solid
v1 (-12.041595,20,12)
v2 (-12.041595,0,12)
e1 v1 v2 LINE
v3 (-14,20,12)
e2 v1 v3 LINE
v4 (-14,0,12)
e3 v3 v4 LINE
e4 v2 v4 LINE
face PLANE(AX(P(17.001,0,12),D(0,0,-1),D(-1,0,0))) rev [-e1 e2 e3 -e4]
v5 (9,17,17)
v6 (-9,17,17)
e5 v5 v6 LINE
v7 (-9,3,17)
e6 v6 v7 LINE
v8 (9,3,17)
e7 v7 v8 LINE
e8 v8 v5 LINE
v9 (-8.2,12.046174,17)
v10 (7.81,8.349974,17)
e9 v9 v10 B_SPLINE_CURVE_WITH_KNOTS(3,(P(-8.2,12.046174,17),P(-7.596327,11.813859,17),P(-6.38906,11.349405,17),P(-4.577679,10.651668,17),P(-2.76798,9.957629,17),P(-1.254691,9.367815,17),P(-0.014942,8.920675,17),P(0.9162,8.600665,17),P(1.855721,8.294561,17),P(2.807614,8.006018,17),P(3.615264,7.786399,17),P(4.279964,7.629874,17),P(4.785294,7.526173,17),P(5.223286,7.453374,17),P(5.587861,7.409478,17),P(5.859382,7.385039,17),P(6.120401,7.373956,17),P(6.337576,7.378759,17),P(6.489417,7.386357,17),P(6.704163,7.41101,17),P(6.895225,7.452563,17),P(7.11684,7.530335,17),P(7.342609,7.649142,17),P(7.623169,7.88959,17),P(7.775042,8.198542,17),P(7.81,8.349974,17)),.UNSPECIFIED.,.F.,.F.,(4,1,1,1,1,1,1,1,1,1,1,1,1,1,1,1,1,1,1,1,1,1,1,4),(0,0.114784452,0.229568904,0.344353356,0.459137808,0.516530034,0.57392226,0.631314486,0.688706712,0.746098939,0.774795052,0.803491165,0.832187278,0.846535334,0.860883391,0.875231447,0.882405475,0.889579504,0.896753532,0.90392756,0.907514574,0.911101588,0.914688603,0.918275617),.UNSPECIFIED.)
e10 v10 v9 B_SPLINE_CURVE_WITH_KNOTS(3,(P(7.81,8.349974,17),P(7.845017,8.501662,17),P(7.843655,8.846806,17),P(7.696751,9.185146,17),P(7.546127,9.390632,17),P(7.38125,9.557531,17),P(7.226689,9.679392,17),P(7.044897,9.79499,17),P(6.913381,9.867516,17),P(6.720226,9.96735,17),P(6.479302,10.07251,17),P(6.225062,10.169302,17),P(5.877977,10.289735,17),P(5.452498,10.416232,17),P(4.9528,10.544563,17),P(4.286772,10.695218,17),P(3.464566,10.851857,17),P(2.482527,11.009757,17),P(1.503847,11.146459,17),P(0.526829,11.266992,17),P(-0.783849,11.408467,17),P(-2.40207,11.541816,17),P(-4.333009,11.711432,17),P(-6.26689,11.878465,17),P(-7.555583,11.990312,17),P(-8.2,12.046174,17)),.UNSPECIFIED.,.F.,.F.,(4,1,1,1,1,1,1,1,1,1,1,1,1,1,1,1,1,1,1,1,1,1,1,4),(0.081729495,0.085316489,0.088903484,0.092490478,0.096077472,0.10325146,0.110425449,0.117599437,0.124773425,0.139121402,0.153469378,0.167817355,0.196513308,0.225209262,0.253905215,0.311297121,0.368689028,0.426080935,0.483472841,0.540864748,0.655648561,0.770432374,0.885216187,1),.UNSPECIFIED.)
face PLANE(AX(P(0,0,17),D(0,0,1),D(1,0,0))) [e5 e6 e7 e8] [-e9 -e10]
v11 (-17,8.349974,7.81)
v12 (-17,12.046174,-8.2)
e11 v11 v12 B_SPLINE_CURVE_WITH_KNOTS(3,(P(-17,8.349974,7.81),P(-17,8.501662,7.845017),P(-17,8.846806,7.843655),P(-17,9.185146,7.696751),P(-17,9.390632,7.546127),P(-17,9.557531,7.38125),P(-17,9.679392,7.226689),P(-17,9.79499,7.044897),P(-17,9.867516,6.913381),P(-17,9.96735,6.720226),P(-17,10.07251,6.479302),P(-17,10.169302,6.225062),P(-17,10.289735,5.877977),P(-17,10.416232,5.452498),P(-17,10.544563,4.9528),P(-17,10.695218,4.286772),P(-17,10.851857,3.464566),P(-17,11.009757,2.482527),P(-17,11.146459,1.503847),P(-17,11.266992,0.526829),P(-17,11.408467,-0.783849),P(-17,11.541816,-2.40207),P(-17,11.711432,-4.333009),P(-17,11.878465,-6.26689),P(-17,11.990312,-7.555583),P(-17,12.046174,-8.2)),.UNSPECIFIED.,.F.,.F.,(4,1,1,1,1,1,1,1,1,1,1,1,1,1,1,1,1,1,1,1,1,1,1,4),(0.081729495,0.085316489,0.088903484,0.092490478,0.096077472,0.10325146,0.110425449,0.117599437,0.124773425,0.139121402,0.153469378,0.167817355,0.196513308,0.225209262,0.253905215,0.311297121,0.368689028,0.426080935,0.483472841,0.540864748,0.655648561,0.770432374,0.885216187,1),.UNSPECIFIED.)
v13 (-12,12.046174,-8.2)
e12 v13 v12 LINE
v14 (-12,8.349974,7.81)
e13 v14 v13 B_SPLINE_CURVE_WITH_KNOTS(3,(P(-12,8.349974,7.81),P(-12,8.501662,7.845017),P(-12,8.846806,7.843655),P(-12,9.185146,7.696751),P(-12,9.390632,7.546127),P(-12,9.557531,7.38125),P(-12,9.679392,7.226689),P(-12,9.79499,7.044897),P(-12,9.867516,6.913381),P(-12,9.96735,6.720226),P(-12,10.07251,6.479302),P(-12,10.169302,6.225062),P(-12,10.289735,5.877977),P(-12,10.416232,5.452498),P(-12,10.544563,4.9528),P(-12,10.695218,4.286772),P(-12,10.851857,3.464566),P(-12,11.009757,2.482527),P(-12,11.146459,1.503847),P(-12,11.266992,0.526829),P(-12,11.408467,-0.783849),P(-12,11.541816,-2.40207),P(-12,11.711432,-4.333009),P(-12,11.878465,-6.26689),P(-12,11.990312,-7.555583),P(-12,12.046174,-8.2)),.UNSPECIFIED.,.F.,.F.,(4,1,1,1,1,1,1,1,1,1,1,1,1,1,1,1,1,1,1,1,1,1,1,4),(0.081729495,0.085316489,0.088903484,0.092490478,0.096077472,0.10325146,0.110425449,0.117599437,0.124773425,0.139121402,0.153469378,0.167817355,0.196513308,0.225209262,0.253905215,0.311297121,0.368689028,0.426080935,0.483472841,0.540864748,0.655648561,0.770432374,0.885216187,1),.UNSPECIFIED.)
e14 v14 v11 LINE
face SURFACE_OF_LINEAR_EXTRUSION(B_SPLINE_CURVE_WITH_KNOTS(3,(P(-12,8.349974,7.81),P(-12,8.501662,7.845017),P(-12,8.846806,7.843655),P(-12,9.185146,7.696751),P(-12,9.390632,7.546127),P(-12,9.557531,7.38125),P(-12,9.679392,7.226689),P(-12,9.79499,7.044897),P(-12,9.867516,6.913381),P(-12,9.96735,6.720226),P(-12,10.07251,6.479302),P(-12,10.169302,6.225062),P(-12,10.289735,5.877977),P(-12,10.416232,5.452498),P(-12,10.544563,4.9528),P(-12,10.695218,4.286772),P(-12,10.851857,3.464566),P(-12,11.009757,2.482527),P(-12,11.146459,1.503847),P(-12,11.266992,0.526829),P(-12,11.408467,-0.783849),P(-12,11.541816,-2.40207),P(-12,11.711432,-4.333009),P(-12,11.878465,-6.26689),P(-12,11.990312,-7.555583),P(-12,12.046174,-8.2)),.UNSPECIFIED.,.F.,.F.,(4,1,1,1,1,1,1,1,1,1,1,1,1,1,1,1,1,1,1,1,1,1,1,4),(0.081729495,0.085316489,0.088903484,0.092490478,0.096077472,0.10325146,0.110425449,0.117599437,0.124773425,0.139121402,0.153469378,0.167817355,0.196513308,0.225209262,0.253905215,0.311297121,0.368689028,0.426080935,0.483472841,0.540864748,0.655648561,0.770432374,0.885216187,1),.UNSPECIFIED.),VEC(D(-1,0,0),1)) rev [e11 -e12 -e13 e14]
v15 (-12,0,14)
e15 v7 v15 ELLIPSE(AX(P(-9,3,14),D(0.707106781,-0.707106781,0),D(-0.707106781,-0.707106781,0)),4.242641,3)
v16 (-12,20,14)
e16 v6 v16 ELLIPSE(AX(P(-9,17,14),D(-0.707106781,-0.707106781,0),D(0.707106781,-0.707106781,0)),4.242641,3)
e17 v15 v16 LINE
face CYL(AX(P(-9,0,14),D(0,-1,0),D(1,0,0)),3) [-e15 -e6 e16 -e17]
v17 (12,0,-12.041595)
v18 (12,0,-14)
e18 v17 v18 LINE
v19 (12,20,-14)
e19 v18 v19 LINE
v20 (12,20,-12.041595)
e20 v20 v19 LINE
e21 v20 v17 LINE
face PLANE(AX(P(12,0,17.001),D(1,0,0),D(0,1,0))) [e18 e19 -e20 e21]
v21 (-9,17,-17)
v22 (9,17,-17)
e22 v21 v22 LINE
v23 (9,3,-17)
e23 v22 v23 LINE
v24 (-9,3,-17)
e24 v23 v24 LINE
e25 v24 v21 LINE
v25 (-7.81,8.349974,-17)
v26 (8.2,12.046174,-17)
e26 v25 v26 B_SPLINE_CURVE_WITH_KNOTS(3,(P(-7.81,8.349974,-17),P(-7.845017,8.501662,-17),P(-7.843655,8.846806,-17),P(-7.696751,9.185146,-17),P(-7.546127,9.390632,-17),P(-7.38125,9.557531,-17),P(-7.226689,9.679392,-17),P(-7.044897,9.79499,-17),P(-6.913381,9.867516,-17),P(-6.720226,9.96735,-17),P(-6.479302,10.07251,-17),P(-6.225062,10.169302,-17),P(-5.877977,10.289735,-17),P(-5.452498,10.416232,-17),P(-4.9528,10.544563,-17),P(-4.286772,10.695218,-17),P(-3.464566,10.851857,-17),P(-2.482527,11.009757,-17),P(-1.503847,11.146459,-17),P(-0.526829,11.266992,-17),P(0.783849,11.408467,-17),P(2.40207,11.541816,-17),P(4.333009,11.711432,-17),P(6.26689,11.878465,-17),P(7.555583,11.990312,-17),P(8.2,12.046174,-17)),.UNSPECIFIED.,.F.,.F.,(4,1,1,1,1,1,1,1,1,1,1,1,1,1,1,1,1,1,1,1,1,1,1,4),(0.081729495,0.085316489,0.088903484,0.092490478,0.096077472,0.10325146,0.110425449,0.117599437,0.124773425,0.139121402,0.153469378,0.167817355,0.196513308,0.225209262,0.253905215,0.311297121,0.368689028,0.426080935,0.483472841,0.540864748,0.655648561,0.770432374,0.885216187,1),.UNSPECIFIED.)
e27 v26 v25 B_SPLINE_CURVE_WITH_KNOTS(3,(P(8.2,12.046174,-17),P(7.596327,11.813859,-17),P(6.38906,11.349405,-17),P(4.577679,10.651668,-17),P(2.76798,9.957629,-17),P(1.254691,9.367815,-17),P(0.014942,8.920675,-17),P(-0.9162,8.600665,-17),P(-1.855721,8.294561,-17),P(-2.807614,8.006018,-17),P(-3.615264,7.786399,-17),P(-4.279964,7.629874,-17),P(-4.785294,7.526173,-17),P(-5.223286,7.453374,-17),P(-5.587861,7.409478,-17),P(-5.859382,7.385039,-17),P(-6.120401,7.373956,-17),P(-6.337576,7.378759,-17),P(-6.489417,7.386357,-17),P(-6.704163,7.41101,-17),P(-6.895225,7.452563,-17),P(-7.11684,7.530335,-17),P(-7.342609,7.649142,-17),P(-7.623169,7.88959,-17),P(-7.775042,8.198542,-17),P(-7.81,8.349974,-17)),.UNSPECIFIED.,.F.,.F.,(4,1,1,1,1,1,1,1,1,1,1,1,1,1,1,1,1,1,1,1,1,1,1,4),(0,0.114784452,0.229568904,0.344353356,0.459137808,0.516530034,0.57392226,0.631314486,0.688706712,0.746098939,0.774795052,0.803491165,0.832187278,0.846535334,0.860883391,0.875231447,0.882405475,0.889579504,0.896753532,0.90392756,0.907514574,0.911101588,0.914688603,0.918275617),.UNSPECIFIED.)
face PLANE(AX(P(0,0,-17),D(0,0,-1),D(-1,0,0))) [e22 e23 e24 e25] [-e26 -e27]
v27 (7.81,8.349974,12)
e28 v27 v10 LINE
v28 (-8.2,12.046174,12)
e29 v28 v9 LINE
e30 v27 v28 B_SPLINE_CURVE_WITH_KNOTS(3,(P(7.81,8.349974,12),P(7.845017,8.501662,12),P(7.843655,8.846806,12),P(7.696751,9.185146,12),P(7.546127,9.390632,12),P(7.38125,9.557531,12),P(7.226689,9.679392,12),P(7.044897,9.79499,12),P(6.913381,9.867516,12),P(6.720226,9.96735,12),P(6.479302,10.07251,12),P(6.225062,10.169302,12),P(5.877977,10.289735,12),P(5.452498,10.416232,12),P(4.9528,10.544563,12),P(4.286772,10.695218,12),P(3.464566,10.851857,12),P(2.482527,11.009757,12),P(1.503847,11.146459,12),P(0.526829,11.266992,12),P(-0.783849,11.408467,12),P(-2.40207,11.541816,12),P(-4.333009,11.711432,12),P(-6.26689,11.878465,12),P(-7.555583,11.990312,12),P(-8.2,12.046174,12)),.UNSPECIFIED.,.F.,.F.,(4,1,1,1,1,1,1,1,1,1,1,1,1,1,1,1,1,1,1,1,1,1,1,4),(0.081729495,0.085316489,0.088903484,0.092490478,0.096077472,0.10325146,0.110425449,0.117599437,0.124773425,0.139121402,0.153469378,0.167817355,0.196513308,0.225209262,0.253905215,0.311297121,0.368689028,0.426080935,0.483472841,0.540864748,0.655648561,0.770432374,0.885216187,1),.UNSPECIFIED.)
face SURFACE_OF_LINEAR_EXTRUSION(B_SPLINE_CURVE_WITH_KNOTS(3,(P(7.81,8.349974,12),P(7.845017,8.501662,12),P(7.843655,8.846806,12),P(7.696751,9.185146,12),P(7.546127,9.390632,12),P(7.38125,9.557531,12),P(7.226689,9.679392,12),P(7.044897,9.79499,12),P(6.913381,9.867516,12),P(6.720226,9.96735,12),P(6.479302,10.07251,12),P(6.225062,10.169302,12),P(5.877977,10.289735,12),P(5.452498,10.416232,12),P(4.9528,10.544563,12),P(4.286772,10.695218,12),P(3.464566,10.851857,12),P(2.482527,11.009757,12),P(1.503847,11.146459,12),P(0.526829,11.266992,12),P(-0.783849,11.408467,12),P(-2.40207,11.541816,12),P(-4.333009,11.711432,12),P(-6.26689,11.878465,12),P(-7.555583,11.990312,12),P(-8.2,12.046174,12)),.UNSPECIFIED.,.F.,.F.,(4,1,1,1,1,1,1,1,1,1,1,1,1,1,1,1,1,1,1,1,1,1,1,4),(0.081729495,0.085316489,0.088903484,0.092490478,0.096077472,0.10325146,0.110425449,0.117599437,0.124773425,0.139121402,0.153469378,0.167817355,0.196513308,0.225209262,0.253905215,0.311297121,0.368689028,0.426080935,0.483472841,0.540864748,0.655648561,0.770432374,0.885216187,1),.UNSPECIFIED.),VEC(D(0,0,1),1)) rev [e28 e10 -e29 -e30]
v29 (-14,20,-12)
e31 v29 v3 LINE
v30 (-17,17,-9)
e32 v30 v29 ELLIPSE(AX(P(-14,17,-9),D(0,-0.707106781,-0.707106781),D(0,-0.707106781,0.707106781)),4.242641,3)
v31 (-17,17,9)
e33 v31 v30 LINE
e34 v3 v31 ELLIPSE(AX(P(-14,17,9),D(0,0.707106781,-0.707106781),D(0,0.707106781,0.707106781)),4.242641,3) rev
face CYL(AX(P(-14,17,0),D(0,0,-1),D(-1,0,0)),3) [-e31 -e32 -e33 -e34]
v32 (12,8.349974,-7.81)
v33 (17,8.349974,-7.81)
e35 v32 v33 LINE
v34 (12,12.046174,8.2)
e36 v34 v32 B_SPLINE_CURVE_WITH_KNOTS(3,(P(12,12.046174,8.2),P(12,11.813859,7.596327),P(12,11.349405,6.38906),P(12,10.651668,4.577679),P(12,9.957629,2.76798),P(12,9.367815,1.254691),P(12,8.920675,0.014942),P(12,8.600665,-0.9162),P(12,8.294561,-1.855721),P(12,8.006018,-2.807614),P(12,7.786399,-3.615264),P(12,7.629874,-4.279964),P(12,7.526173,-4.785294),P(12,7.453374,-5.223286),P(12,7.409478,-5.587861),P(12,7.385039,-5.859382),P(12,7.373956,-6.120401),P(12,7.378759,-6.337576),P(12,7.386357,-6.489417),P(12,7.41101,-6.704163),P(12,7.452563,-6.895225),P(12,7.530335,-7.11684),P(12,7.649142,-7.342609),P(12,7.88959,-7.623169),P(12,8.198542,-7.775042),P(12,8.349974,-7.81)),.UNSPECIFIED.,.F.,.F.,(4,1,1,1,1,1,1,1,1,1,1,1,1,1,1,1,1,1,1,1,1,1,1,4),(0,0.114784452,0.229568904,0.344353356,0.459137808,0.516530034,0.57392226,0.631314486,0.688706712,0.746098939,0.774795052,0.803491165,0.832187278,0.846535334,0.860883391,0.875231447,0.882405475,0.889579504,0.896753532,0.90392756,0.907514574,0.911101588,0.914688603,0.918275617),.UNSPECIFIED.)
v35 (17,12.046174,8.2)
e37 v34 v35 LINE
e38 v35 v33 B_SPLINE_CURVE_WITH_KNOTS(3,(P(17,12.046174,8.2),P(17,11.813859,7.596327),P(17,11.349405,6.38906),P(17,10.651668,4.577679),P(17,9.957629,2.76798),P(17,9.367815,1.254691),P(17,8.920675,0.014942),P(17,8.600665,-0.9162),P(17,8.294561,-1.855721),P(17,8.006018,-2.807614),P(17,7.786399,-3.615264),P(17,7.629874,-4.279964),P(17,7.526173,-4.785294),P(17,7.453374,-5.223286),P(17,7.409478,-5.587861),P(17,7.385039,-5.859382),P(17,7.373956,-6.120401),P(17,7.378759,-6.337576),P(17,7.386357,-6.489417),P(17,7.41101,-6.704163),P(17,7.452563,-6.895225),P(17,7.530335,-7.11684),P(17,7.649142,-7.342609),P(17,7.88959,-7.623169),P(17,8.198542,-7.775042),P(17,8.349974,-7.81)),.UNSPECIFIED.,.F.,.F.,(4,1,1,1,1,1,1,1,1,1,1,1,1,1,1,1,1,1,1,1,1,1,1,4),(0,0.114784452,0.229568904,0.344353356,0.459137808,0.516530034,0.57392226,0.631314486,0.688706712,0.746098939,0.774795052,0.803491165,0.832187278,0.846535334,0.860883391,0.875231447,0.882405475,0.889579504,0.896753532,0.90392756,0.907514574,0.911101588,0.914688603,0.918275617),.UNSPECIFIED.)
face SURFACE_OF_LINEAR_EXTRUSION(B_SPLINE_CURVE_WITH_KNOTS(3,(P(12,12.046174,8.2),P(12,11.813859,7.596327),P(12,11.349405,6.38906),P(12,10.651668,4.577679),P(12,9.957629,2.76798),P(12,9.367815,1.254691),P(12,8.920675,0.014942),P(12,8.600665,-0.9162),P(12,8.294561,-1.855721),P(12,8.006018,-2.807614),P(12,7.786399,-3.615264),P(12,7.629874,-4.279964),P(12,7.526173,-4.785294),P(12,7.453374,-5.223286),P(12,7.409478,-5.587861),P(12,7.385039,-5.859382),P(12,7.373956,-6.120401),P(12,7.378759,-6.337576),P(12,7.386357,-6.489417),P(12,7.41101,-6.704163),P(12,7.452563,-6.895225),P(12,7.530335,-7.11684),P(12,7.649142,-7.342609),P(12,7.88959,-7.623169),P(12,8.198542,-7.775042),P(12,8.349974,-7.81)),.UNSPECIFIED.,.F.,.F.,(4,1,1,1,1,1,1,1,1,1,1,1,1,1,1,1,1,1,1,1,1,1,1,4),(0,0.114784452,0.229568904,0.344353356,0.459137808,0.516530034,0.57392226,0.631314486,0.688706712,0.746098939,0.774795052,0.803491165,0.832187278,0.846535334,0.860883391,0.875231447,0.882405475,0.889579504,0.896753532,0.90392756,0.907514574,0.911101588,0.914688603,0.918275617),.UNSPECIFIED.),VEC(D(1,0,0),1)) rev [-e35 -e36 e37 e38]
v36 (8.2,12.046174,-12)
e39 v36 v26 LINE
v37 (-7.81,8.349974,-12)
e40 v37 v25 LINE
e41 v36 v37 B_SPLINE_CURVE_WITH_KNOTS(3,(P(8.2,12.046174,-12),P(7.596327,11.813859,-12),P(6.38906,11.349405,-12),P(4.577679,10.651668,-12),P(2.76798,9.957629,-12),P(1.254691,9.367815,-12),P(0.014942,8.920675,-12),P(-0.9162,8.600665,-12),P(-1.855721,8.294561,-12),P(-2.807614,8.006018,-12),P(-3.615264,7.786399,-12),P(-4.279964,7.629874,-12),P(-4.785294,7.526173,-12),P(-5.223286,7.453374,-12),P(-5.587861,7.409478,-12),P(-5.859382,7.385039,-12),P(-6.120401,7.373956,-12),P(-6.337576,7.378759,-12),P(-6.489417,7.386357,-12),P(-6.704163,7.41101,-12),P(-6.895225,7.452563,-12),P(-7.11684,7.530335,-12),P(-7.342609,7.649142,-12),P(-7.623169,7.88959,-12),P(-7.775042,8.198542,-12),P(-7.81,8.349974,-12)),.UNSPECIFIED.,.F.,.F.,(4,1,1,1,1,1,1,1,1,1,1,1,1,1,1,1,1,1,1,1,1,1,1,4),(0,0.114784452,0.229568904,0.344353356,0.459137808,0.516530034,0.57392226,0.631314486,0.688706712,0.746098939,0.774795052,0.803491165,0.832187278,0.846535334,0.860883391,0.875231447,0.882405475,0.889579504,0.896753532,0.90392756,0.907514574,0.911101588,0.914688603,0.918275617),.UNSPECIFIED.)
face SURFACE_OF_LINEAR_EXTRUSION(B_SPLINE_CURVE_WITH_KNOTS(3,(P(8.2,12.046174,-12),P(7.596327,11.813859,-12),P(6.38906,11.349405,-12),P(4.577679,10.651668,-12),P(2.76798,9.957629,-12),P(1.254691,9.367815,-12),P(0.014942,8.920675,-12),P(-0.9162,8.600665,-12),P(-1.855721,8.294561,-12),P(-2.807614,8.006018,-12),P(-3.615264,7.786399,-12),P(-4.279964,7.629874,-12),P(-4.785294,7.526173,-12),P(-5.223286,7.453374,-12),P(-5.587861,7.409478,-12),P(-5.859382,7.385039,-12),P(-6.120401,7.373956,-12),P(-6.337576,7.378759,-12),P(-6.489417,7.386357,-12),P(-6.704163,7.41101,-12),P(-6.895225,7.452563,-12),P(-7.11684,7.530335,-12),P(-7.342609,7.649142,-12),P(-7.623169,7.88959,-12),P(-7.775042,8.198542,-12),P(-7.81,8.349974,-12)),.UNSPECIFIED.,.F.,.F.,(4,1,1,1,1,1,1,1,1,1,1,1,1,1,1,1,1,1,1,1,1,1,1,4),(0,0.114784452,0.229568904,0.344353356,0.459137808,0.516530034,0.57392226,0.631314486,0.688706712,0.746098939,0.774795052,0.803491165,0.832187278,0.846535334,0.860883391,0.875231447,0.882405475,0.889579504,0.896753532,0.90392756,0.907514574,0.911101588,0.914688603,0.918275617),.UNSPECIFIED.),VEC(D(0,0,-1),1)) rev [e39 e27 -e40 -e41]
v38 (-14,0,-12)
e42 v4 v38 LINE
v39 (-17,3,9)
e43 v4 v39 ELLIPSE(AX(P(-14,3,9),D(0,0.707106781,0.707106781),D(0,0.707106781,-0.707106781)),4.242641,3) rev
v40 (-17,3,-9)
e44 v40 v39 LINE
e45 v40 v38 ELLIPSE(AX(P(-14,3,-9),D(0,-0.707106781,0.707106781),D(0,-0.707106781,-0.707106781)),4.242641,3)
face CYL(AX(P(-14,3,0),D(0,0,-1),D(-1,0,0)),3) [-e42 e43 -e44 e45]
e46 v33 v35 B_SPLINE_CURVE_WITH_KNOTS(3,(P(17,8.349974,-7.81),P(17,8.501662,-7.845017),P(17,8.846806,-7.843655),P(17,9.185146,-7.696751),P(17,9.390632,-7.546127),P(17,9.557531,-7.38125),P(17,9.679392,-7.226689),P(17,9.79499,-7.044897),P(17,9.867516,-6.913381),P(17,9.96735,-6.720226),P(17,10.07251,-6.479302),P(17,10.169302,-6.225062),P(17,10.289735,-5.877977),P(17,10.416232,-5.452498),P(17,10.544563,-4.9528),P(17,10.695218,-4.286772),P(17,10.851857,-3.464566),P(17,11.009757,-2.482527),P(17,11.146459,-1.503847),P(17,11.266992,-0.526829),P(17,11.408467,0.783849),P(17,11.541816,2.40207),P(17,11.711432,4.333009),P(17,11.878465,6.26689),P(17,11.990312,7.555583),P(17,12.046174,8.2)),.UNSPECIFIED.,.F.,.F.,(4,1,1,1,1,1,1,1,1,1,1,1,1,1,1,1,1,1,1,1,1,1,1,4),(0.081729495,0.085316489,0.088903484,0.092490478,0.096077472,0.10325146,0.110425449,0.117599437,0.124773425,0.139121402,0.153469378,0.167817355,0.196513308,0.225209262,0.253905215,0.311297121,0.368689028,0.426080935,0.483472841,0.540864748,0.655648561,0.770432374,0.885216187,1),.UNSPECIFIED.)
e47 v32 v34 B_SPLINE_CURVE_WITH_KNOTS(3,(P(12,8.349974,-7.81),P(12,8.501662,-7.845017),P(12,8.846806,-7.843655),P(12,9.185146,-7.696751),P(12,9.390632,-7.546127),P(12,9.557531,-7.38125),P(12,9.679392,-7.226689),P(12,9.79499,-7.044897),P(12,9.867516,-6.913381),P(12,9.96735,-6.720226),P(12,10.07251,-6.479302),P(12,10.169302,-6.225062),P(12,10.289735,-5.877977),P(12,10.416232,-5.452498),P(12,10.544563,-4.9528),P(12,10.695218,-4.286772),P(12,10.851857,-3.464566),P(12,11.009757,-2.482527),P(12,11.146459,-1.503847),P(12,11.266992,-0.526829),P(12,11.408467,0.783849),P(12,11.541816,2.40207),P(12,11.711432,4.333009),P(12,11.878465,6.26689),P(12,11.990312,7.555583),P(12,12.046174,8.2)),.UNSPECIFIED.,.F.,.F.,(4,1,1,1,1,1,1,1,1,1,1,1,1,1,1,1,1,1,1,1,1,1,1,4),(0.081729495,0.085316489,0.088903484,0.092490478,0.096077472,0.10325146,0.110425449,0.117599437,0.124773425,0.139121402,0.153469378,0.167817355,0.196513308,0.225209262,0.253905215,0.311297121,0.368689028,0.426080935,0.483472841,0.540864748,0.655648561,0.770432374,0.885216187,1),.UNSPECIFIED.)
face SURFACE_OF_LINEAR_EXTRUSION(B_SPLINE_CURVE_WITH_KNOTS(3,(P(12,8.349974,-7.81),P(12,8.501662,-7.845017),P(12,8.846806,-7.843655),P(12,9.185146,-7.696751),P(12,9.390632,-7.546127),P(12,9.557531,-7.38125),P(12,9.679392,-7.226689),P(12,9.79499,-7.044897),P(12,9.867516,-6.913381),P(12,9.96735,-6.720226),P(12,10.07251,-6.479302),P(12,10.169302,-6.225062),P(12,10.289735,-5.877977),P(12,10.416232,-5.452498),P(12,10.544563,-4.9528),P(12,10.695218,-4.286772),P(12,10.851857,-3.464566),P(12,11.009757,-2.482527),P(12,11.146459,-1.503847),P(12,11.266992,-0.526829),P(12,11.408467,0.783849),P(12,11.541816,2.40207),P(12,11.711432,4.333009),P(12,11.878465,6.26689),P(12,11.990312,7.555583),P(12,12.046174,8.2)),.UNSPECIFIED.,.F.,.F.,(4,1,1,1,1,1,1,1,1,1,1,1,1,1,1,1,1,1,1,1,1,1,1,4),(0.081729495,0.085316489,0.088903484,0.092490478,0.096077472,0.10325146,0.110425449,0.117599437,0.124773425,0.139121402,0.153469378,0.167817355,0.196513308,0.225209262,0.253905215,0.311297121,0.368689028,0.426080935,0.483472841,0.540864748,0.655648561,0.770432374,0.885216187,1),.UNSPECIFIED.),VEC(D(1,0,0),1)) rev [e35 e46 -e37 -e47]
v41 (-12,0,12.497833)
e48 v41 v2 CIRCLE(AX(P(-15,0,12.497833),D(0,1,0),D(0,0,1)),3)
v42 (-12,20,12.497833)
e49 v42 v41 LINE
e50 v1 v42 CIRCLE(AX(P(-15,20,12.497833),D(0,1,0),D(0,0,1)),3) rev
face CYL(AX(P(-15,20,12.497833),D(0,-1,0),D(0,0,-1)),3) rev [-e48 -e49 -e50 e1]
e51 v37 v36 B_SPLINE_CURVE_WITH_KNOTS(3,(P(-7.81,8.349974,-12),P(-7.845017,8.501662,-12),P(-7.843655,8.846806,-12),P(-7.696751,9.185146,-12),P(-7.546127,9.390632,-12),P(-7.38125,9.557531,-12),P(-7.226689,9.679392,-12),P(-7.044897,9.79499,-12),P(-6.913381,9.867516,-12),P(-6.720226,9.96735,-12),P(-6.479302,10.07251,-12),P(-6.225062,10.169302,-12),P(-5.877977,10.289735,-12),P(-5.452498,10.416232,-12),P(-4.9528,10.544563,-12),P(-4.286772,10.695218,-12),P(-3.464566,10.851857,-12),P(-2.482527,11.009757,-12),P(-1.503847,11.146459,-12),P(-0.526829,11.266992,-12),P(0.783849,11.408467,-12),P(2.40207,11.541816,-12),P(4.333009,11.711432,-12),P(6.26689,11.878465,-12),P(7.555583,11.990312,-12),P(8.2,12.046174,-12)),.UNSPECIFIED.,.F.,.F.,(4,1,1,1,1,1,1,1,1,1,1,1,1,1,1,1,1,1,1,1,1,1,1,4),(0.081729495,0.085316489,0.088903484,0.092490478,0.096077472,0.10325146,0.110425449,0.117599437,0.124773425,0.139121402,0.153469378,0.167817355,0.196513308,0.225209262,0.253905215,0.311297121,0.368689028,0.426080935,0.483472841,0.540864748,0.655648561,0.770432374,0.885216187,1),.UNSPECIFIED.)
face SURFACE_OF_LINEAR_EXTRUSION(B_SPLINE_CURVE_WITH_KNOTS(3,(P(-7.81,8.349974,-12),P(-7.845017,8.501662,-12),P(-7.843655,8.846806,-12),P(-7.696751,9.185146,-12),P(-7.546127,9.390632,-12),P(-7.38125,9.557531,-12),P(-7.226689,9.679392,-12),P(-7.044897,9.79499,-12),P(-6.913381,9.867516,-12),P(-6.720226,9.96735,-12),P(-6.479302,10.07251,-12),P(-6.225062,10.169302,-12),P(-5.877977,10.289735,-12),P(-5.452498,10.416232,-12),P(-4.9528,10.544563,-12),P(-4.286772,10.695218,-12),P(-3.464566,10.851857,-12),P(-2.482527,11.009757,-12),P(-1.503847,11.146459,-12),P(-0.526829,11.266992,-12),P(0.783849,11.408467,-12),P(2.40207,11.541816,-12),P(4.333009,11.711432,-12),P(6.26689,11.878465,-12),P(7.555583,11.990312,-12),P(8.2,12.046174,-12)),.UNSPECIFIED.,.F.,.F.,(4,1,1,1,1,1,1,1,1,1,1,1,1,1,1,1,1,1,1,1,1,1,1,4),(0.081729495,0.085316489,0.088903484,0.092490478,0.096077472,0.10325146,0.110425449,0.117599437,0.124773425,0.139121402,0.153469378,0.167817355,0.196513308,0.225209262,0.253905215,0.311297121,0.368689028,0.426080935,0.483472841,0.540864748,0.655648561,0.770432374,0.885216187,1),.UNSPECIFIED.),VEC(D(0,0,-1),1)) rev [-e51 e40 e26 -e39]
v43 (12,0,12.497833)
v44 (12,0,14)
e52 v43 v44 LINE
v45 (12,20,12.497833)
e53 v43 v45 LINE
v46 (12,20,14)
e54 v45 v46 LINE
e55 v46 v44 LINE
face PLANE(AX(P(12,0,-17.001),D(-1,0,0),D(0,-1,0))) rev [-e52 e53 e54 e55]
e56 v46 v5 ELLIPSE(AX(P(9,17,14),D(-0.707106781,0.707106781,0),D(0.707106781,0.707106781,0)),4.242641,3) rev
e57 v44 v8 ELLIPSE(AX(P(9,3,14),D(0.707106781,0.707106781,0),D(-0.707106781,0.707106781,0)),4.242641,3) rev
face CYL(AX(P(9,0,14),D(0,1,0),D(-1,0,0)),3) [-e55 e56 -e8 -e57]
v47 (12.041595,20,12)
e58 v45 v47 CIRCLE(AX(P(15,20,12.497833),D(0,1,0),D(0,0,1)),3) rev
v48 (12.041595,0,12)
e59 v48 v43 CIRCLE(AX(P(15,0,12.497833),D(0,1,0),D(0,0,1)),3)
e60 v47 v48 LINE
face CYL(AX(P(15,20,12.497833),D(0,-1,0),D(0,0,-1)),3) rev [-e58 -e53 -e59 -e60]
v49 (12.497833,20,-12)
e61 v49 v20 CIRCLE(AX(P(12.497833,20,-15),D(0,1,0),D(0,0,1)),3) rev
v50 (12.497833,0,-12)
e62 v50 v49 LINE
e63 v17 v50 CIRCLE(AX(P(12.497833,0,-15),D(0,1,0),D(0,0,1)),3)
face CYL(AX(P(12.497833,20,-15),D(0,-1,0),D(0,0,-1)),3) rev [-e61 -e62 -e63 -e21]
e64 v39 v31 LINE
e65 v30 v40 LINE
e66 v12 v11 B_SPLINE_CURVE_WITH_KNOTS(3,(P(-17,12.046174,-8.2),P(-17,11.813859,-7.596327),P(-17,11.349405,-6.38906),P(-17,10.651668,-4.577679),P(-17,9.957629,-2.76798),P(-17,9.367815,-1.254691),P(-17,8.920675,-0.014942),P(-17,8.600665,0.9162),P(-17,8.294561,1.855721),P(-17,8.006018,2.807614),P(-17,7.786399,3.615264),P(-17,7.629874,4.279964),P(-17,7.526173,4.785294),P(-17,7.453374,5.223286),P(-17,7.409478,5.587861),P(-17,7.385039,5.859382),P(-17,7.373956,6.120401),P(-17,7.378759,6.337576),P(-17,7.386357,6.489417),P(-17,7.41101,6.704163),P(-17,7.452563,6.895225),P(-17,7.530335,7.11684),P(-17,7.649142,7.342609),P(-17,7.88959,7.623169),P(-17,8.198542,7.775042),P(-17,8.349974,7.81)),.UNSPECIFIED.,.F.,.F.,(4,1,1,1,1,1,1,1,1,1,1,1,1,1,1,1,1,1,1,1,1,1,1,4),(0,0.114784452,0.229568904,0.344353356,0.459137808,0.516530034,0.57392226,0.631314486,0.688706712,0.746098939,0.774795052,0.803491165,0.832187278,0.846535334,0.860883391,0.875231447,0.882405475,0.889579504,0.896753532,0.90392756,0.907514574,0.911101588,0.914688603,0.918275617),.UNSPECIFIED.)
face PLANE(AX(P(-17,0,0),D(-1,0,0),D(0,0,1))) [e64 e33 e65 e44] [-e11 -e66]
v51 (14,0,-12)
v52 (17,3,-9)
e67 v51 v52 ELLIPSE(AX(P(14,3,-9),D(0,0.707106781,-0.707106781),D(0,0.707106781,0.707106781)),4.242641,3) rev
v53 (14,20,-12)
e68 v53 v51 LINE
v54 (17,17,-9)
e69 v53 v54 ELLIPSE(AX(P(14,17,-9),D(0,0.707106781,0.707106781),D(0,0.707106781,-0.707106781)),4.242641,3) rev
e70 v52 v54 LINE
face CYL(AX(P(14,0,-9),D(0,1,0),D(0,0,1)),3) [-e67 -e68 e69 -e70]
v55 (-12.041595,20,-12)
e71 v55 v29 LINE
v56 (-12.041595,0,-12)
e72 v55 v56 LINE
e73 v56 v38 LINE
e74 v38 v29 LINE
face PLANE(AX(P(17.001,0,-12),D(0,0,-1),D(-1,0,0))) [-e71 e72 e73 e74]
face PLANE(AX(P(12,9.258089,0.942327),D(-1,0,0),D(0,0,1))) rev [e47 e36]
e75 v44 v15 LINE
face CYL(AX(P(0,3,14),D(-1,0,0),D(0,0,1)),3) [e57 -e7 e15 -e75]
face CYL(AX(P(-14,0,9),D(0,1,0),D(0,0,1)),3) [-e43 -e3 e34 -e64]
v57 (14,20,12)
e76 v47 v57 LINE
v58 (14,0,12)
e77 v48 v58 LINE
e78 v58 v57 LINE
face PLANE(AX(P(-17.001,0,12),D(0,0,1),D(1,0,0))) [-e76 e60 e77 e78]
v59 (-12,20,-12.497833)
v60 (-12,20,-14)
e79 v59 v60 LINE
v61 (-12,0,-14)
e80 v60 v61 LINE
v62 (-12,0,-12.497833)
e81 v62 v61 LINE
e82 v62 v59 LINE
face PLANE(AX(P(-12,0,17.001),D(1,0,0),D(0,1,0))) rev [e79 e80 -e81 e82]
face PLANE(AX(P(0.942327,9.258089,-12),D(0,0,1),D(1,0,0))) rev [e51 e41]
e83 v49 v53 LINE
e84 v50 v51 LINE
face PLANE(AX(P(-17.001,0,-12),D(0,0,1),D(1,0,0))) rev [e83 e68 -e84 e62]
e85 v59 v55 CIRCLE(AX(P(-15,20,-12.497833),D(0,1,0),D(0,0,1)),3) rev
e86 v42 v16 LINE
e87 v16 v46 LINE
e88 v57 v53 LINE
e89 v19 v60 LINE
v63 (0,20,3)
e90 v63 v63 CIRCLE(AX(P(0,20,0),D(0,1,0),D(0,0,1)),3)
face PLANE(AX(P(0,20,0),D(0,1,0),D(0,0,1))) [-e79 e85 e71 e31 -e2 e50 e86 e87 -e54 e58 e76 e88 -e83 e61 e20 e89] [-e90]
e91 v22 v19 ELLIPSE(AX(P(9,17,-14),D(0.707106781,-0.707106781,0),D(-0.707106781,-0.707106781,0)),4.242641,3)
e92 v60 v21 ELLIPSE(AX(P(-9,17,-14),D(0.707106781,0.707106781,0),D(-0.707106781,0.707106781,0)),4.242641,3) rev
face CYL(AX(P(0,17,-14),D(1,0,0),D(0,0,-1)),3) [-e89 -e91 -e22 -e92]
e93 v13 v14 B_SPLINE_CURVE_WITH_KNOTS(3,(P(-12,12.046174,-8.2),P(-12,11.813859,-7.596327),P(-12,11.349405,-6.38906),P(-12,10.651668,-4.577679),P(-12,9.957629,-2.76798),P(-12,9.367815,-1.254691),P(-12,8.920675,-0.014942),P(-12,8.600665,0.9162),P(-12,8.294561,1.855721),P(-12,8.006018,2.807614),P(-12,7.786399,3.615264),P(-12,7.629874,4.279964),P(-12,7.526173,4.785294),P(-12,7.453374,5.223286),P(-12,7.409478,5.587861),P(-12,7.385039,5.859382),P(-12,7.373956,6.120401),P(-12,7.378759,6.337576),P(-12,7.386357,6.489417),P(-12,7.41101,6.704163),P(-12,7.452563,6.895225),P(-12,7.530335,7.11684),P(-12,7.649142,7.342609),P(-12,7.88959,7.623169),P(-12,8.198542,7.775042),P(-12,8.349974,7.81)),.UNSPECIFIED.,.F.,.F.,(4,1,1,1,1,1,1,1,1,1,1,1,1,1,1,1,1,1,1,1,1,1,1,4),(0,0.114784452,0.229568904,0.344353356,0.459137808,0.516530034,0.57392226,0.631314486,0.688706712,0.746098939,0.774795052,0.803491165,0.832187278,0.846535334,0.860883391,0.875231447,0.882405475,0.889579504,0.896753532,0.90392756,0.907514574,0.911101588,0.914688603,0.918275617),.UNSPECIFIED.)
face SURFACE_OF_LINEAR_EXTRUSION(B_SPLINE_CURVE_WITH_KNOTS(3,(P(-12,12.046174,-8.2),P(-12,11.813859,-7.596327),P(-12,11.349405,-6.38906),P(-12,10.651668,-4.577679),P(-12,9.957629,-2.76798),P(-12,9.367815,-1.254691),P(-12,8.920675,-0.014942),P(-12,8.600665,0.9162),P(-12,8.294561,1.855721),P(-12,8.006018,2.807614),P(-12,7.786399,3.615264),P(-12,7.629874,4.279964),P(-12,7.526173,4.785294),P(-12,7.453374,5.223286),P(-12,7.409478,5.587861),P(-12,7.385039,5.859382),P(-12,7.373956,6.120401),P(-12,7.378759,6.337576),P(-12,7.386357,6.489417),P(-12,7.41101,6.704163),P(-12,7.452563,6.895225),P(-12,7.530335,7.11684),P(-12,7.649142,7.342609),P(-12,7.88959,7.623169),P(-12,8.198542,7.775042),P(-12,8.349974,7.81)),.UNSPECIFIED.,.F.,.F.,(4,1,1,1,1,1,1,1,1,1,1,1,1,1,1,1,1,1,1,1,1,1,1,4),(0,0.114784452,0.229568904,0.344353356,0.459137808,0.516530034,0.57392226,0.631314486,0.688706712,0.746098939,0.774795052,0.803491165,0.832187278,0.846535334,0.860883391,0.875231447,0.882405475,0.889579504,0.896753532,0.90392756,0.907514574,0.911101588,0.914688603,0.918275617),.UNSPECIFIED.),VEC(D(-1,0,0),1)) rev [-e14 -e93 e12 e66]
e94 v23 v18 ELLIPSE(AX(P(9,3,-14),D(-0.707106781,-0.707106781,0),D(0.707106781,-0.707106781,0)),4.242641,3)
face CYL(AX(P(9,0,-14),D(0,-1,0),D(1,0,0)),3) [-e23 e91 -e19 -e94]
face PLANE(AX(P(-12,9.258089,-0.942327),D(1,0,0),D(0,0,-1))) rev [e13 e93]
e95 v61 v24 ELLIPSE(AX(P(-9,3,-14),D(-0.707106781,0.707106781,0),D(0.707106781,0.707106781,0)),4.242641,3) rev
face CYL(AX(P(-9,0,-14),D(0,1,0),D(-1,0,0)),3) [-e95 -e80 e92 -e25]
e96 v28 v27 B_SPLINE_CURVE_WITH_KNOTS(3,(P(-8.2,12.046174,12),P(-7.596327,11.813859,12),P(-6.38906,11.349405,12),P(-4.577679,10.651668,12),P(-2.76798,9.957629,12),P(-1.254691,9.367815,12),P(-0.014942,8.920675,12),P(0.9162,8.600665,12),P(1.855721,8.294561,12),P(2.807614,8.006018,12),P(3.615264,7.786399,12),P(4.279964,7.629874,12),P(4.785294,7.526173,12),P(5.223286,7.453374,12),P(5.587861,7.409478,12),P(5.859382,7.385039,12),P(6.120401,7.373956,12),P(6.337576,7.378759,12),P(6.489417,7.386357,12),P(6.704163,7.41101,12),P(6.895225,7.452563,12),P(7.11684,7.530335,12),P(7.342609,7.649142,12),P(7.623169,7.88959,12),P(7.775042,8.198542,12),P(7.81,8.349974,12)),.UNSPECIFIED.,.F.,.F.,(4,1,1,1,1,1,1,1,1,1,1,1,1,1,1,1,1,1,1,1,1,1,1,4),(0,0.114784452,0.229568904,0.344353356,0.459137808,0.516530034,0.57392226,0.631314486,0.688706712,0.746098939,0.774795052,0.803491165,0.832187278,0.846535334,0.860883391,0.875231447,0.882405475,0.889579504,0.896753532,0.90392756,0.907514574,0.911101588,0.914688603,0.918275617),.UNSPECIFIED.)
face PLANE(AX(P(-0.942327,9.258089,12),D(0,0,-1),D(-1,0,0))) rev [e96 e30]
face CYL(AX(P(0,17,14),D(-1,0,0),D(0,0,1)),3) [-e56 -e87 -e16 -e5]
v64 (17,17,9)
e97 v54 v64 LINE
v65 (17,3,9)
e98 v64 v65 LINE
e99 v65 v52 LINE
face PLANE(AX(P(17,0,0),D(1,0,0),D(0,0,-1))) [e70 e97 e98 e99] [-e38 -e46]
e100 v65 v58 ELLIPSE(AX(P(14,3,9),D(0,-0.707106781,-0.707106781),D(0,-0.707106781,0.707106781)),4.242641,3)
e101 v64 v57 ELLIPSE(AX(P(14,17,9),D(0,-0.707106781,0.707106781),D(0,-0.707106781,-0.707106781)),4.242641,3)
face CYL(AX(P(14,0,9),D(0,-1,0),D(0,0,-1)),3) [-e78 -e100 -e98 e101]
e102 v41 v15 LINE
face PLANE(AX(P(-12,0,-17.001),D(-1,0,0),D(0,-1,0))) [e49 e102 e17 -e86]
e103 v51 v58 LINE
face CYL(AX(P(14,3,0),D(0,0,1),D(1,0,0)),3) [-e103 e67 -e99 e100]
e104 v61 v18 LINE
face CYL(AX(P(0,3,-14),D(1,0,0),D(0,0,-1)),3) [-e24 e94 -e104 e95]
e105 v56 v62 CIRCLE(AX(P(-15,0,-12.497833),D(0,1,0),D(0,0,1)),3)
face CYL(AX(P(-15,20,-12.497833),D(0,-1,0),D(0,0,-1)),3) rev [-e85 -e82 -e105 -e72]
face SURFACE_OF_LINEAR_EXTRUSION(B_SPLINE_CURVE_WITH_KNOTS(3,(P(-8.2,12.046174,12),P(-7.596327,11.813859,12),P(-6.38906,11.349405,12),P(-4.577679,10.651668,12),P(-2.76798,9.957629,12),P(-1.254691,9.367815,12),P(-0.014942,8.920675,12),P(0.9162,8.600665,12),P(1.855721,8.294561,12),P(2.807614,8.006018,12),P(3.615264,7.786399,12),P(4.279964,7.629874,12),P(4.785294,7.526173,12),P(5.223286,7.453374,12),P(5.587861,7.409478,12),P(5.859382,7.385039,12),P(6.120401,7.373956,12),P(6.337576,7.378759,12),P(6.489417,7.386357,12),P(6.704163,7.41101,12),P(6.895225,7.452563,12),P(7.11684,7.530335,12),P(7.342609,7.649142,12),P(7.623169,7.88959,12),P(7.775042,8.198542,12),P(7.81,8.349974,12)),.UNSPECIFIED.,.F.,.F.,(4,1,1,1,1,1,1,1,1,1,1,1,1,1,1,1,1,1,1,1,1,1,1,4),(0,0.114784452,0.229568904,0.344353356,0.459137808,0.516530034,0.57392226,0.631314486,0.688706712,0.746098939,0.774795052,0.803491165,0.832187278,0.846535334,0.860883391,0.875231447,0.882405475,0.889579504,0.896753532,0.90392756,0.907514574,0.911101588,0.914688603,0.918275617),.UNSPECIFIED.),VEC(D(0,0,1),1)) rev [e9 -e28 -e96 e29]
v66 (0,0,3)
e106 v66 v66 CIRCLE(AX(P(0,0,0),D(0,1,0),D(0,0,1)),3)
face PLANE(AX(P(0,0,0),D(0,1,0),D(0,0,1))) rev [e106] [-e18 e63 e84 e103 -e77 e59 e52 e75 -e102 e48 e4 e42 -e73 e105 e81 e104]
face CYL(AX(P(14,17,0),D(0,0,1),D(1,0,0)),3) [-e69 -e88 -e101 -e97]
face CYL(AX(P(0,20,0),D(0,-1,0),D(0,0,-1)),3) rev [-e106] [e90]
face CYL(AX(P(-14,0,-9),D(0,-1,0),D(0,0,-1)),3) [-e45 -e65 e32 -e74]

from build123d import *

# Parameters (mm, degrees)
ESQUISSE1_R                  = 17
ESQUISSE1_R_2                = 3
BOSS_EXTRU_1_DEPTH           = 20
BOSS_EXTRU_2_START           = -4.958405421
BOSS_EXTRU_2_OUTLINE_W       = 24
BOSS_EXTRU_2_OUTLINE_H       = 20
BOSS_EXTRU_2_DEPTH           = 4.958405421
R_P_TITION_CIRCULAIRE1_COUNT = 4
ENL_V_MAT_EXTRU_1_DEPTH      = 5
R_P_TITION_CIRCULAIRE2_COUNT = 4
CONG_1_R                     = 3


with BuildPart() as part:
    # Esquisse1 → Boss.-Extru.1 (new body)
    with BuildSketch(Plane(origin=(0, 0, 0), x_dir=(1, 0, 0), z_dir=(0, 1, 0))):
        with Locations(Location((0, 0, 0), (0, 0, 270))):
            Circle(ESQUISSE1_R)
        with Locations(Location((0, 0, 0), (0, 0, 270))):
            Circle(ESQUISSE1_R_2, mode=Mode.SUBTRACT)
    extrude(amount=BOSS_EXTRU_1_DEPTH)

    # Boss.-Extru.2: read off the stored shape, not the designer's step
    # Boss.-Extru.2 outline → Boss.-Extru.2 (add)
    with BuildSketch(Plane.XY.offset(17).offset(BOSS_EXTRU_2_START)):
        with Locations((0, 10)):
            Rectangle(BOSS_EXTRU_2_OUTLINE_W, BOSS_EXTRU_2_OUTLINE_H)
    boss_extru_2 = extrude(amount=BOSS_EXTRU_2_DEPTH)

    # Répétition circulaire1: Boss.-Extru.2 ×4 about axis
    r_p_tition_circulaire1_axis = Axis((0, 0, 0), (0, 1, 0))
    for i in range(1, R_P_TITION_CIRCULAIRE1_COUNT):
        add(boss_extru_2.rotate(r_p_tition_circulaire1_axis, i * 360 / R_P_TITION_CIRCULAIRE1_COUNT))

    # Esquisse4 → Enlèv. mat.-Extru.1 (cut)
    with BuildSketch(Plane.XY.offset(17)):
        with BuildLine():
            add(Edge.make_bspline(
                [(7.81, 8.349973898), (7.845016929, 8.501662122), (7.843654617, 8.846805541), (7.696751404, 9.18514572), (7.546127292, 9.390631529), (7.381250134, 9.557530695), (7.226689156, 9.679391685), (7.044897234, 9.794989784), (6.913380901, 9.867515976), (6.720225962, 9.967349744), (6.479301982, 10.072509753), (6.225062352, 10.169302013), (5.877977224, 10.289735152), (5.452497687, 10.416232173), (4.952800318, 10.544562522), (4.28677162, 10.695217805), (3.464566434, 10.851857223), (2.482527073, 11.009757235), (1.503846513, 11.146459181), (0.526828846, 11.266992429), (-0.783848935, 11.408467194), (-2.402070093, 11.54181636), (-4.33300906, 11.711432432), (-6.266889756, 11.878464677), (-7.555583225, 11.990311664), (-8.2, 12.046173638)],
                knots=[0.081729495, 0.081729495, 0.081729495, 0.081729495, 0.085316489, 0.088903484, 0.092490478, 0.096077472, 0.10325146, 0.110425449, 0.117599437, 0.124773425, 0.139121402, 0.153469378, 0.167817355, 0.196513308, 0.225209262, 0.253905215, 0.311297121, 0.368689028, 0.426080935, 0.483472841, 0.540864748, 0.655648561, 0.770432374, 0.885216187, 1, 1, 1, 1], degree=3))
            add(Edge.make_bspline(
                [(-8.2, 12.046173638), (-7.596326539, 11.813858719), (-6.389059736, 11.349405014), (-4.577678814, 10.651667651), (-2.767980405, 9.957629107), (-1.25469062, 9.367814929), (-0.014942254, 8.920675199), (0.916199686, 8.600665462), (1.855721354, 8.294561412), (2.807613901, 8.006017649), (3.615263802, 7.78639928), (4.279964162, 7.629873725), (4.785293813, 7.526173164), (5.223285817, 7.453373867), (5.587861324, 7.409477893), (5.859382183, 7.385039429), (6.120400909, 7.373955903), (6.337576436, 7.378758848), (6.489416814, 7.386356769), (6.70416335, 7.411009967), (6.895225091, 7.452563296), (7.116839622, 7.530334781), (7.342608744, 7.649141627), (7.623168783, 7.889590024), (7.775042154, 8.198541617), (7.81, 8.349973898)],
                knots=[0, 0, 0, 0, 0.114784452, 0.229568904, 0.344353356, 0.459137808, 0.516530034, 0.57392226, 0.631314486, 0.688706712, 0.746098939, 0.774795052, 0.803491165, 0.832187278, 0.846535334, 0.860883391, 0.875231447, 0.882405475, 0.889579504, 0.896753532, 0.90392756, 0.907514574, 0.911101588, 0.914688603, 0.918275617, 0.918275617, 0.918275617, 0.918275617], degree=3))
        make_face()
    enl_v_mat_extru_1 = extrude(amount=-ENL_V_MAT_EXTRU_1_DEPTH, mode=Mode.SUBTRACT)

    # Répétition circulaire2: Enlèv. mat.-Extru.1 ×4 about axis
    r_p_tition_circulaire2_axis = Axis((0, 51.695441496, 0), (0, -1, 0))
    for i in range(1, R_P_TITION_CIRCULAIRE2_COUNT):
        add(enl_v_mat_extru_1.rotate(r_p_tition_circulaire2_axis, i * 360 / R_P_TITION_CIRCULAIRE2_COUNT), mode=Mode.SUBTRACT)

    # Congé1
    # the kernel refuses this fillet: 3 mm, written as the material it adds along each edge
    with BuildSketch(Plane(origin=(12, 0, 12.041594579), x_dir=(0, 0, 1), z_dir=(0, 1, 0)), Plane(origin=(-12, 0, -12.041594579), x_dir=(0, 0, -1), z_dir=(0, 1, 0)), Plane(origin=(12.041594579, 0, -12), x_dir=(1, 0, 0), z_dir=(0, 1, 0))) as cong_1_piece_1:
        with BuildLine():
            CenterArc((0.456238089, 3), CONG_1_R, 260.44790934, 9.55209066)
            ThreePointArc((-0.041594579, 0.041594579), (-0.020779299, 0.02081528), (0, 0))
            Line((0, 0), (0.456238089, 0))
        make_face()
    extrude(amount=20)
    with BuildSketch(Plane(origin=(-12, 20, 12.041594579), x_dir=(-0.70710678118694, 0, -0.7071067811861549), z_dir=(0, -1, 0))) as cong_1_piece_2:
        with BuildLine():
            CenterArc((1.798711297, -2.44392939), CONG_1_R, 125.44790934, 9.55209066)
            Line((-0.322609046, -0.322609046), (0, 0))
            ThreePointArc((0, 0), (0.029411809, -2.5443e-05), (0.058823618, 0))
        make_face()
    extrude(amount=20)
    # the kernel refuses this fillet: 3 mm, written as the material it takes off along each edge
    with BuildSketch(Plane(origin=(19.5, 0, 17), x_dir=(0, 0, -1), z_dir=(-1, 0, 0)), Plane(origin=(19.5, 20, 17), x_dir=(0, -1, 0), z_dir=(-1, 0, 0)), Plane(origin=(-17, 0, 19.5), x_dir=(1, 0, 0), z_dir=(0, 0, -1)), Plane(origin=(-19.5, 0, -17), x_dir=(0, 0, 1), z_dir=(1, 0, 0)), Plane(origin=(17, 0, -19.5), x_dir=(-1, 0, 0), z_dir=(0, 0, 1))) as cong_1_2_piece_1:
        with BuildLine():
            CenterArc((CONG_1_R, -CONG_1_R), CONG_1_R, 90, 90)
            Line((0, -CONG_1_R), (0, 0))
            Line((0, 0), (CONG_1_R, 0))
        make_face()
    extrude(amount=39, mode=Mode.SUBTRACT)
    with BuildSketch(Plane(origin=(12, -7.5, 17), x_dir=(-1, 0, 0), z_dir=(0, 1, 0)), Plane(origin=(-17, -7.5, 12), x_dir=(0, 0, -1), z_dir=(0, 1, 0)), Plane(origin=(-12, -7.5, -17), x_dir=(1, 0, 0), z_dir=(0, 1, 0))) as cong_1_2_piece_2:
        with BuildLine():
            CenterArc((CONG_1_R, -CONG_1_R), CONG_1_R, 90, 90)
            Line((0, -CONG_1_R), (0, 0))
            Line((0, 0), (CONG_1_R, 0))
        make_face()
    extrude(amount=35, mode=Mode.SUBTRACT)
    with BuildSketch(Plane(origin=(-12, 27.5, 17), x_dir=(0, 0, -1), z_dir=(0, -1, 0)), Plane(origin=(-17, 27.5, -12), x_dir=(1, 0, 0), z_dir=(0, -1, 0)), Plane(origin=(12, 27.5, -17), x_dir=(0, 0, 1), z_dir=(0, -1, 0)), Plane(origin=(17, 27.5, 12), x_dir=(-1, 0, 0), z_dir=(0, -1, 0)), Plane(origin=(17, -7.5, -12), x_dir=(-1, 0, 0), z_dir=(0, 1, 0))) as cong_1_2_piece_3:
        with BuildLine():
            CenterArc((CONG_1_R, CONG_1_R), CONG_1_R, 180, 90)
            Line((0, CONG_1_R), (0, 0))
            Line((0, 0), (CONG_1_R, 0))
        make_face()
    extrude(amount=35, mode=Mode.SUBTRACT)
    with BuildSketch(Plane(origin=(-17, 20, -19.5), x_dir=(0, -1, 0), z_dir=(0, 0, 1)), Plane(origin=(19.5, 20, -17), x_dir=(0, -1, 0), z_dir=(-1, 0, 0)), Plane(origin=(17, 20, 19.5), x_dir=(0, -1, 0), z_dir=(0, 0, -1))) as cong_1_2_piece_4:
        with BuildLine():
            CenterArc((CONG_1_R, CONG_1_R), CONG_1_R, 180, 90)
            Line((0, CONG_1_R), (0, 0))
            Line((0, 0), (CONG_1_R, 0))
        make_face()
    extrude(amount=39, mode=Mode.SUBTRACT)


solid = part.part
